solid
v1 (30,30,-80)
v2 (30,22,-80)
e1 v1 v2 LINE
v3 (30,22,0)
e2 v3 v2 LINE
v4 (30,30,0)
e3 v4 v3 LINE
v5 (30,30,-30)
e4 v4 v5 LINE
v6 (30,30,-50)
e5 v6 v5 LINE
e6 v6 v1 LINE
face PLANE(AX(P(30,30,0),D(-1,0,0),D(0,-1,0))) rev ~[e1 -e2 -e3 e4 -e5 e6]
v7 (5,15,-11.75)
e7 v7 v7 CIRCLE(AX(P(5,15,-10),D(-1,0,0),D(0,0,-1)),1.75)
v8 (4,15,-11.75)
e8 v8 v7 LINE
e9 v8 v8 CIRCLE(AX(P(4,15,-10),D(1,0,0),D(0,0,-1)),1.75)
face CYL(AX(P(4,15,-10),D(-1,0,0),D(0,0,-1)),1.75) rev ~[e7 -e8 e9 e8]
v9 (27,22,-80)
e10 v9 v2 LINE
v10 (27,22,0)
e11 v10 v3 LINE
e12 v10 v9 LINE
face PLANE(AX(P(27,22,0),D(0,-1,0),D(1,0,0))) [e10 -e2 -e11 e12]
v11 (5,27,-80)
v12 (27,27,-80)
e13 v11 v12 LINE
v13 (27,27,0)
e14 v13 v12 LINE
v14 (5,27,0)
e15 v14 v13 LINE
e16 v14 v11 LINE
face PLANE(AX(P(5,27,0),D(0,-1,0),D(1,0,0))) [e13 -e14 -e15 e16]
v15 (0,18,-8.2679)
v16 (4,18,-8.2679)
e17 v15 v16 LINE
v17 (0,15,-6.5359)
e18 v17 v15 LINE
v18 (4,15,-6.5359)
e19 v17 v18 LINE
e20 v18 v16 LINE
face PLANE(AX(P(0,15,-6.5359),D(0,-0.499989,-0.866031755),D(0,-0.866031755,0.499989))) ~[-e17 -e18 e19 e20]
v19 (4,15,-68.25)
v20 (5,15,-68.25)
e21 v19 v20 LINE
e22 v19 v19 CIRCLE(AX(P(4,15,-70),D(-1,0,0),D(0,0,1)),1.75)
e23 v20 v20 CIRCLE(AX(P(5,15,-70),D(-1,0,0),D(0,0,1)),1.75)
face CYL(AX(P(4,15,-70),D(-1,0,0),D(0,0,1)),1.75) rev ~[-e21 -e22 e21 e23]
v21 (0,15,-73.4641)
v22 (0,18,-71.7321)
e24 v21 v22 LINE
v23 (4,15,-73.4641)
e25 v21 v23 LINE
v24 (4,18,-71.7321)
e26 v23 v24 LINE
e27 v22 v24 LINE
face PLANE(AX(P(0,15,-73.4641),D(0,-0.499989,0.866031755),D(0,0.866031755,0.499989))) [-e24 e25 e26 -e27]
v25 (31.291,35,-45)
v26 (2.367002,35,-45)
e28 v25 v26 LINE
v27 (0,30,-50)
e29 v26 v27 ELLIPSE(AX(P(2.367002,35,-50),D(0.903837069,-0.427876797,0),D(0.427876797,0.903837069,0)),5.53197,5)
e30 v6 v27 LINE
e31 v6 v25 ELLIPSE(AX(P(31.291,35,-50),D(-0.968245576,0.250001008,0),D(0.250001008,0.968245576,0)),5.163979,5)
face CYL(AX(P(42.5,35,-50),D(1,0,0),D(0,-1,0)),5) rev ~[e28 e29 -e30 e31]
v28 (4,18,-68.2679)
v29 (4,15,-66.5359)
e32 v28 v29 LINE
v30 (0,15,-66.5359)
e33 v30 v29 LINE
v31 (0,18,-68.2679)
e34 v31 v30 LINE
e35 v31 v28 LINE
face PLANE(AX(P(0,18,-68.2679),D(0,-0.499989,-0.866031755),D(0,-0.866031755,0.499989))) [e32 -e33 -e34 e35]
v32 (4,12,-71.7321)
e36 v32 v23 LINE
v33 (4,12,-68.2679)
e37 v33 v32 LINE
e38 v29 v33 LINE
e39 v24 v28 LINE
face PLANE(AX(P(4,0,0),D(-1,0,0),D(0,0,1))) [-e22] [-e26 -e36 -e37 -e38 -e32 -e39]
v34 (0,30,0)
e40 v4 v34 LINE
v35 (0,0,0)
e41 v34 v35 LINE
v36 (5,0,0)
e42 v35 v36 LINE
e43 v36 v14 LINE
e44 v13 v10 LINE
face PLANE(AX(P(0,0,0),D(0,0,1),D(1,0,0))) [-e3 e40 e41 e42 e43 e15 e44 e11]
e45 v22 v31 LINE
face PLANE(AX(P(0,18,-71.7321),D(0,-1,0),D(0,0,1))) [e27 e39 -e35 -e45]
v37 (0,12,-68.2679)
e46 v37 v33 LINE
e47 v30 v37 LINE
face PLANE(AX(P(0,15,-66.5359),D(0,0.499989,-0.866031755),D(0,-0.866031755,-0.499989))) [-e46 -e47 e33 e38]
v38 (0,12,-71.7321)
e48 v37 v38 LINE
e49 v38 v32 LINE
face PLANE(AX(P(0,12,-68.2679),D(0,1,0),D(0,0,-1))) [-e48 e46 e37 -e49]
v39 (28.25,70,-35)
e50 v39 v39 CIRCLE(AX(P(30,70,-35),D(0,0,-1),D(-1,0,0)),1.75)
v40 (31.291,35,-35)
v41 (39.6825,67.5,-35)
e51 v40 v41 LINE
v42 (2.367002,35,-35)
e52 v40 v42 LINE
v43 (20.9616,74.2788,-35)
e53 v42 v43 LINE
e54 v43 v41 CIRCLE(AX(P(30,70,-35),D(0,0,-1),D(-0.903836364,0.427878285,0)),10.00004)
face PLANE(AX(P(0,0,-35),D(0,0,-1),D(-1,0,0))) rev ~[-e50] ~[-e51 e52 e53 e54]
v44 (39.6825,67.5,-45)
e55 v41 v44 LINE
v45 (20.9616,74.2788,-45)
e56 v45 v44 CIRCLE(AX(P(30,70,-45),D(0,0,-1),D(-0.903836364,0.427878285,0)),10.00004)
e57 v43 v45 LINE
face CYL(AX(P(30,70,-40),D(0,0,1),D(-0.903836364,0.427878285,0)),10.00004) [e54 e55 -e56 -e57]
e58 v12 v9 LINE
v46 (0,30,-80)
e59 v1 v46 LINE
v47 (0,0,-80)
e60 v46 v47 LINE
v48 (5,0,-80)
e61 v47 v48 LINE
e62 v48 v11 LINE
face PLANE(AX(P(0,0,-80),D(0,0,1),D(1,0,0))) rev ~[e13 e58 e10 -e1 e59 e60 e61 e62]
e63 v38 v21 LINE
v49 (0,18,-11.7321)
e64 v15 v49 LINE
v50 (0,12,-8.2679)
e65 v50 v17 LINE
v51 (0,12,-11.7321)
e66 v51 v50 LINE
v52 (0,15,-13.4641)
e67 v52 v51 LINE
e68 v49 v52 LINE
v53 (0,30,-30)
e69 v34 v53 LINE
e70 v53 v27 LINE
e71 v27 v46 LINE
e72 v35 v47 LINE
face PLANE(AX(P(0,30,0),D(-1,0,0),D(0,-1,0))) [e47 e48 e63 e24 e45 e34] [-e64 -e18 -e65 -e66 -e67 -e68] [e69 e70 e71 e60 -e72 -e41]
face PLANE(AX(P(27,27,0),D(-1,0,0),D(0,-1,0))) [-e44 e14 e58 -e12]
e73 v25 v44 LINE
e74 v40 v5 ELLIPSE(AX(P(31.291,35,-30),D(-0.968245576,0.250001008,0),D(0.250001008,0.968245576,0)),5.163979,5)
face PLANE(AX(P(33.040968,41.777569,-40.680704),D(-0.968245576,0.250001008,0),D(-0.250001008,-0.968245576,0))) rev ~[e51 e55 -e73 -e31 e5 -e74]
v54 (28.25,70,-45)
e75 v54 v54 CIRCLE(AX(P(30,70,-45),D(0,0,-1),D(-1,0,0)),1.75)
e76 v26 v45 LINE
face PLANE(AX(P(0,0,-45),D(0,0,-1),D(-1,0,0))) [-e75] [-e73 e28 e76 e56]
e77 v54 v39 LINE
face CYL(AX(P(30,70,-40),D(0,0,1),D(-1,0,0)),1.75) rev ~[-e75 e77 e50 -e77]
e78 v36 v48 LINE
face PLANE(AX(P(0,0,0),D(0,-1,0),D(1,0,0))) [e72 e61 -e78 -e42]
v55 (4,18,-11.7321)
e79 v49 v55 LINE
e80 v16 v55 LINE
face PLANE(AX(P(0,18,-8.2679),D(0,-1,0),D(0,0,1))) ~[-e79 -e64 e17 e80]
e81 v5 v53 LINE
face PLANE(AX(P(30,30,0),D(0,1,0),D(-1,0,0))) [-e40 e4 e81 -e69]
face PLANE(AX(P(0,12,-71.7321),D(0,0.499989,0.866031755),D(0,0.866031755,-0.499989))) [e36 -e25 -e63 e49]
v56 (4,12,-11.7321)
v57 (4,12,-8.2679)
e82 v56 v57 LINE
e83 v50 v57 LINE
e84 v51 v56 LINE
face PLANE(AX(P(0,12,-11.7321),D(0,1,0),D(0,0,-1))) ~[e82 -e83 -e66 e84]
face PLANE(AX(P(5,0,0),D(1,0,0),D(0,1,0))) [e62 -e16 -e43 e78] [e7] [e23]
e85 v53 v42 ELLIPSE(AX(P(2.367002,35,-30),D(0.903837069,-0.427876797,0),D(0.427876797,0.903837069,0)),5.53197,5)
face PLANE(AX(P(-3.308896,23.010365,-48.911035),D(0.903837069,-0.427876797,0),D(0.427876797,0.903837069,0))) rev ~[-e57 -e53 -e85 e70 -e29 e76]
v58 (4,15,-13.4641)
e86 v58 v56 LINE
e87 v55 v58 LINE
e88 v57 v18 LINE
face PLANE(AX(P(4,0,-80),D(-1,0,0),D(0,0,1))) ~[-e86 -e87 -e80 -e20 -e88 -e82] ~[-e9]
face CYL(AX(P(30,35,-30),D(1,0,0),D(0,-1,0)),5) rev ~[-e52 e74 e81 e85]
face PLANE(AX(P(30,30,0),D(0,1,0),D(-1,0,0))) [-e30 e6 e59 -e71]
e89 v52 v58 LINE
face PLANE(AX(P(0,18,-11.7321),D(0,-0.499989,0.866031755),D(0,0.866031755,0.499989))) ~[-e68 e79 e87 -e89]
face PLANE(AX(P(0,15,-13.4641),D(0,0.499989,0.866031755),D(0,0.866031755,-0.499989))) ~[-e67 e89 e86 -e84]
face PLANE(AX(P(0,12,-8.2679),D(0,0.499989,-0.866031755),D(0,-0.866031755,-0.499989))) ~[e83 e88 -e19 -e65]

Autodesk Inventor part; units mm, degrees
ref_plane "YZ Plane" through (0, 0, 0) normal (1, 0, 0) x (0, 1, 0)
ref_plane "XZ Plane" through (0, 0, 0) normal (0, 1, 0) x (-1, 0, 0)
ref_plane "XY Plane" through (0, 0, 0) normal (0, 0, 1) x (1, 0, 0)
sketch "Эскиз1" plane through (0, 0, 0) normal (0, 0, 1) x (1, 0, 0)
  line L0 (30, 30) -> (0, 30)
  line L1 (0, 30) -> (0, 0)
  line L2 (30, 30) -> (30, 22)
  line L3 (5, 0) -> (5, 27)
  line L4 (5, 27) -> (27, 27)
  line L5 (27, 27) -> (27, 22)
  line L6 (0, 0) -> (5, 0)
  line L7 (27, 22) -> (30, 22)
  dimension "d0" = 30
  dimension "d2" = 30
  dimension "d5" = 5
  dimension "d6" = 8
  dimension "d15" = 3
  dimension "d16" = 3
  dimension "d17" = 5
extrude "Выдавливание1" add sketch "Эскиз1" against normal blind 80
sketch "Эскиз2" plane through (0, 0, 0) normal (-1, 0, 0) x (0, 0, 1)
  line L0 (0, 30) -> (-80, 30) projected
  line L1 (-70, 30) -> (-70, 0) construction
  line L2 (0, 0) -> (-80, 0) projected
  circle A0 centre (-70, 15) radius 3 construction
  line L3 (-68.2679, 18) -> (-66.5359, 15)
  line L4 (-66.5359, 15) -> (-68.2679, 12)
  line L5 (-68.2679, 12) -> (-71.7321, 12)
  line L6 (-71.7321, 12) -> (-73.4641, 15)
  line L7 (-73.4641, 15) -> (-71.7321, 18)
  line L8 (-71.7321, 18) -> (-68.2679, 18)
  line L9 (-80, 0) -> (-80, 30) projected
  line L10 (0, 30) -> (-80, 30) projected
  point P0 (-70, 18)
  dimension "d9" = 6
  dimension "d30" = 10
extrude "Выдавливание2" cut sketch "Эскиз2" against normal blind 4
sketch "Эскиз3" plane through (4, 0, 0) normal (-1, 0, 0) x (0, 0, 1)
  line L0 (-71.7321, 18) -> (-68.2679, 18) projected
  line L1 (-70, 18) -> (-70, 12) construction
  line L2 (-68.2679, 12) -> (-71.7321, 12) projected
  circle A0 centre (-70, 15) radius 1.75
  point P0 (0, 0)
  dimension "d18" = 3.5
extrude "Выдавливание3" cut sketch "Эскиз3" against normal up to next
ref_plane "РабПлоскость1" through (0, 0, -40) normal (0, 0, -1) x (-1, 0, 0)
sketch "Эскиз4" plane through (0, 0, -40) normal (0, 0, -1) x (-1, 0, 0)
  arc A0 (-20.9616, 74.2788) -> (-39.6825, 67.5) centre (-30, 70) ccw
  line L0 (-30, 30) -> (-30, 22) projected
  line L1 (-30, 30) -> (-39.6825, 67.5)
  line L2 (0, 30) -> (0, 0) projected
  line L3 (0, 30) -> (-20.9616, 74.2788)
  circle A1 centre (-30, 70) radius 1.75
  line L4 (-30, 22) -> (-30, 30)
  line L5 (-30, 30) -> (0, 30)
  line L6 (-30, 22) -> (-27, 22) projected
  dimension "d21" = 20
  dimension "d22" = 3.5
  dimension "d31" = 30
  dimension "d32" = 40
extrude "Выдавливание4" add sketch "Эскиз4" along normal mid plane 10
fillet "Сопряжение1" radius 5 2 edges at (15, 30, -45) (15, 30, -35)
mirror "Зеркальное отражение1" about plane through (0, 0, -40) normal (0, 0, -1) of "Выдавливание2", "Выдавливание3"
sketch "Эскиз5" plane through (5, 0, 0) normal (1, 0, 0) x (0, 0, -1)
  point P0 (0, 0)
equation "\"d6\" = d5 + d4"
equation "\"d4\" = 3"
properties part number "holder"
